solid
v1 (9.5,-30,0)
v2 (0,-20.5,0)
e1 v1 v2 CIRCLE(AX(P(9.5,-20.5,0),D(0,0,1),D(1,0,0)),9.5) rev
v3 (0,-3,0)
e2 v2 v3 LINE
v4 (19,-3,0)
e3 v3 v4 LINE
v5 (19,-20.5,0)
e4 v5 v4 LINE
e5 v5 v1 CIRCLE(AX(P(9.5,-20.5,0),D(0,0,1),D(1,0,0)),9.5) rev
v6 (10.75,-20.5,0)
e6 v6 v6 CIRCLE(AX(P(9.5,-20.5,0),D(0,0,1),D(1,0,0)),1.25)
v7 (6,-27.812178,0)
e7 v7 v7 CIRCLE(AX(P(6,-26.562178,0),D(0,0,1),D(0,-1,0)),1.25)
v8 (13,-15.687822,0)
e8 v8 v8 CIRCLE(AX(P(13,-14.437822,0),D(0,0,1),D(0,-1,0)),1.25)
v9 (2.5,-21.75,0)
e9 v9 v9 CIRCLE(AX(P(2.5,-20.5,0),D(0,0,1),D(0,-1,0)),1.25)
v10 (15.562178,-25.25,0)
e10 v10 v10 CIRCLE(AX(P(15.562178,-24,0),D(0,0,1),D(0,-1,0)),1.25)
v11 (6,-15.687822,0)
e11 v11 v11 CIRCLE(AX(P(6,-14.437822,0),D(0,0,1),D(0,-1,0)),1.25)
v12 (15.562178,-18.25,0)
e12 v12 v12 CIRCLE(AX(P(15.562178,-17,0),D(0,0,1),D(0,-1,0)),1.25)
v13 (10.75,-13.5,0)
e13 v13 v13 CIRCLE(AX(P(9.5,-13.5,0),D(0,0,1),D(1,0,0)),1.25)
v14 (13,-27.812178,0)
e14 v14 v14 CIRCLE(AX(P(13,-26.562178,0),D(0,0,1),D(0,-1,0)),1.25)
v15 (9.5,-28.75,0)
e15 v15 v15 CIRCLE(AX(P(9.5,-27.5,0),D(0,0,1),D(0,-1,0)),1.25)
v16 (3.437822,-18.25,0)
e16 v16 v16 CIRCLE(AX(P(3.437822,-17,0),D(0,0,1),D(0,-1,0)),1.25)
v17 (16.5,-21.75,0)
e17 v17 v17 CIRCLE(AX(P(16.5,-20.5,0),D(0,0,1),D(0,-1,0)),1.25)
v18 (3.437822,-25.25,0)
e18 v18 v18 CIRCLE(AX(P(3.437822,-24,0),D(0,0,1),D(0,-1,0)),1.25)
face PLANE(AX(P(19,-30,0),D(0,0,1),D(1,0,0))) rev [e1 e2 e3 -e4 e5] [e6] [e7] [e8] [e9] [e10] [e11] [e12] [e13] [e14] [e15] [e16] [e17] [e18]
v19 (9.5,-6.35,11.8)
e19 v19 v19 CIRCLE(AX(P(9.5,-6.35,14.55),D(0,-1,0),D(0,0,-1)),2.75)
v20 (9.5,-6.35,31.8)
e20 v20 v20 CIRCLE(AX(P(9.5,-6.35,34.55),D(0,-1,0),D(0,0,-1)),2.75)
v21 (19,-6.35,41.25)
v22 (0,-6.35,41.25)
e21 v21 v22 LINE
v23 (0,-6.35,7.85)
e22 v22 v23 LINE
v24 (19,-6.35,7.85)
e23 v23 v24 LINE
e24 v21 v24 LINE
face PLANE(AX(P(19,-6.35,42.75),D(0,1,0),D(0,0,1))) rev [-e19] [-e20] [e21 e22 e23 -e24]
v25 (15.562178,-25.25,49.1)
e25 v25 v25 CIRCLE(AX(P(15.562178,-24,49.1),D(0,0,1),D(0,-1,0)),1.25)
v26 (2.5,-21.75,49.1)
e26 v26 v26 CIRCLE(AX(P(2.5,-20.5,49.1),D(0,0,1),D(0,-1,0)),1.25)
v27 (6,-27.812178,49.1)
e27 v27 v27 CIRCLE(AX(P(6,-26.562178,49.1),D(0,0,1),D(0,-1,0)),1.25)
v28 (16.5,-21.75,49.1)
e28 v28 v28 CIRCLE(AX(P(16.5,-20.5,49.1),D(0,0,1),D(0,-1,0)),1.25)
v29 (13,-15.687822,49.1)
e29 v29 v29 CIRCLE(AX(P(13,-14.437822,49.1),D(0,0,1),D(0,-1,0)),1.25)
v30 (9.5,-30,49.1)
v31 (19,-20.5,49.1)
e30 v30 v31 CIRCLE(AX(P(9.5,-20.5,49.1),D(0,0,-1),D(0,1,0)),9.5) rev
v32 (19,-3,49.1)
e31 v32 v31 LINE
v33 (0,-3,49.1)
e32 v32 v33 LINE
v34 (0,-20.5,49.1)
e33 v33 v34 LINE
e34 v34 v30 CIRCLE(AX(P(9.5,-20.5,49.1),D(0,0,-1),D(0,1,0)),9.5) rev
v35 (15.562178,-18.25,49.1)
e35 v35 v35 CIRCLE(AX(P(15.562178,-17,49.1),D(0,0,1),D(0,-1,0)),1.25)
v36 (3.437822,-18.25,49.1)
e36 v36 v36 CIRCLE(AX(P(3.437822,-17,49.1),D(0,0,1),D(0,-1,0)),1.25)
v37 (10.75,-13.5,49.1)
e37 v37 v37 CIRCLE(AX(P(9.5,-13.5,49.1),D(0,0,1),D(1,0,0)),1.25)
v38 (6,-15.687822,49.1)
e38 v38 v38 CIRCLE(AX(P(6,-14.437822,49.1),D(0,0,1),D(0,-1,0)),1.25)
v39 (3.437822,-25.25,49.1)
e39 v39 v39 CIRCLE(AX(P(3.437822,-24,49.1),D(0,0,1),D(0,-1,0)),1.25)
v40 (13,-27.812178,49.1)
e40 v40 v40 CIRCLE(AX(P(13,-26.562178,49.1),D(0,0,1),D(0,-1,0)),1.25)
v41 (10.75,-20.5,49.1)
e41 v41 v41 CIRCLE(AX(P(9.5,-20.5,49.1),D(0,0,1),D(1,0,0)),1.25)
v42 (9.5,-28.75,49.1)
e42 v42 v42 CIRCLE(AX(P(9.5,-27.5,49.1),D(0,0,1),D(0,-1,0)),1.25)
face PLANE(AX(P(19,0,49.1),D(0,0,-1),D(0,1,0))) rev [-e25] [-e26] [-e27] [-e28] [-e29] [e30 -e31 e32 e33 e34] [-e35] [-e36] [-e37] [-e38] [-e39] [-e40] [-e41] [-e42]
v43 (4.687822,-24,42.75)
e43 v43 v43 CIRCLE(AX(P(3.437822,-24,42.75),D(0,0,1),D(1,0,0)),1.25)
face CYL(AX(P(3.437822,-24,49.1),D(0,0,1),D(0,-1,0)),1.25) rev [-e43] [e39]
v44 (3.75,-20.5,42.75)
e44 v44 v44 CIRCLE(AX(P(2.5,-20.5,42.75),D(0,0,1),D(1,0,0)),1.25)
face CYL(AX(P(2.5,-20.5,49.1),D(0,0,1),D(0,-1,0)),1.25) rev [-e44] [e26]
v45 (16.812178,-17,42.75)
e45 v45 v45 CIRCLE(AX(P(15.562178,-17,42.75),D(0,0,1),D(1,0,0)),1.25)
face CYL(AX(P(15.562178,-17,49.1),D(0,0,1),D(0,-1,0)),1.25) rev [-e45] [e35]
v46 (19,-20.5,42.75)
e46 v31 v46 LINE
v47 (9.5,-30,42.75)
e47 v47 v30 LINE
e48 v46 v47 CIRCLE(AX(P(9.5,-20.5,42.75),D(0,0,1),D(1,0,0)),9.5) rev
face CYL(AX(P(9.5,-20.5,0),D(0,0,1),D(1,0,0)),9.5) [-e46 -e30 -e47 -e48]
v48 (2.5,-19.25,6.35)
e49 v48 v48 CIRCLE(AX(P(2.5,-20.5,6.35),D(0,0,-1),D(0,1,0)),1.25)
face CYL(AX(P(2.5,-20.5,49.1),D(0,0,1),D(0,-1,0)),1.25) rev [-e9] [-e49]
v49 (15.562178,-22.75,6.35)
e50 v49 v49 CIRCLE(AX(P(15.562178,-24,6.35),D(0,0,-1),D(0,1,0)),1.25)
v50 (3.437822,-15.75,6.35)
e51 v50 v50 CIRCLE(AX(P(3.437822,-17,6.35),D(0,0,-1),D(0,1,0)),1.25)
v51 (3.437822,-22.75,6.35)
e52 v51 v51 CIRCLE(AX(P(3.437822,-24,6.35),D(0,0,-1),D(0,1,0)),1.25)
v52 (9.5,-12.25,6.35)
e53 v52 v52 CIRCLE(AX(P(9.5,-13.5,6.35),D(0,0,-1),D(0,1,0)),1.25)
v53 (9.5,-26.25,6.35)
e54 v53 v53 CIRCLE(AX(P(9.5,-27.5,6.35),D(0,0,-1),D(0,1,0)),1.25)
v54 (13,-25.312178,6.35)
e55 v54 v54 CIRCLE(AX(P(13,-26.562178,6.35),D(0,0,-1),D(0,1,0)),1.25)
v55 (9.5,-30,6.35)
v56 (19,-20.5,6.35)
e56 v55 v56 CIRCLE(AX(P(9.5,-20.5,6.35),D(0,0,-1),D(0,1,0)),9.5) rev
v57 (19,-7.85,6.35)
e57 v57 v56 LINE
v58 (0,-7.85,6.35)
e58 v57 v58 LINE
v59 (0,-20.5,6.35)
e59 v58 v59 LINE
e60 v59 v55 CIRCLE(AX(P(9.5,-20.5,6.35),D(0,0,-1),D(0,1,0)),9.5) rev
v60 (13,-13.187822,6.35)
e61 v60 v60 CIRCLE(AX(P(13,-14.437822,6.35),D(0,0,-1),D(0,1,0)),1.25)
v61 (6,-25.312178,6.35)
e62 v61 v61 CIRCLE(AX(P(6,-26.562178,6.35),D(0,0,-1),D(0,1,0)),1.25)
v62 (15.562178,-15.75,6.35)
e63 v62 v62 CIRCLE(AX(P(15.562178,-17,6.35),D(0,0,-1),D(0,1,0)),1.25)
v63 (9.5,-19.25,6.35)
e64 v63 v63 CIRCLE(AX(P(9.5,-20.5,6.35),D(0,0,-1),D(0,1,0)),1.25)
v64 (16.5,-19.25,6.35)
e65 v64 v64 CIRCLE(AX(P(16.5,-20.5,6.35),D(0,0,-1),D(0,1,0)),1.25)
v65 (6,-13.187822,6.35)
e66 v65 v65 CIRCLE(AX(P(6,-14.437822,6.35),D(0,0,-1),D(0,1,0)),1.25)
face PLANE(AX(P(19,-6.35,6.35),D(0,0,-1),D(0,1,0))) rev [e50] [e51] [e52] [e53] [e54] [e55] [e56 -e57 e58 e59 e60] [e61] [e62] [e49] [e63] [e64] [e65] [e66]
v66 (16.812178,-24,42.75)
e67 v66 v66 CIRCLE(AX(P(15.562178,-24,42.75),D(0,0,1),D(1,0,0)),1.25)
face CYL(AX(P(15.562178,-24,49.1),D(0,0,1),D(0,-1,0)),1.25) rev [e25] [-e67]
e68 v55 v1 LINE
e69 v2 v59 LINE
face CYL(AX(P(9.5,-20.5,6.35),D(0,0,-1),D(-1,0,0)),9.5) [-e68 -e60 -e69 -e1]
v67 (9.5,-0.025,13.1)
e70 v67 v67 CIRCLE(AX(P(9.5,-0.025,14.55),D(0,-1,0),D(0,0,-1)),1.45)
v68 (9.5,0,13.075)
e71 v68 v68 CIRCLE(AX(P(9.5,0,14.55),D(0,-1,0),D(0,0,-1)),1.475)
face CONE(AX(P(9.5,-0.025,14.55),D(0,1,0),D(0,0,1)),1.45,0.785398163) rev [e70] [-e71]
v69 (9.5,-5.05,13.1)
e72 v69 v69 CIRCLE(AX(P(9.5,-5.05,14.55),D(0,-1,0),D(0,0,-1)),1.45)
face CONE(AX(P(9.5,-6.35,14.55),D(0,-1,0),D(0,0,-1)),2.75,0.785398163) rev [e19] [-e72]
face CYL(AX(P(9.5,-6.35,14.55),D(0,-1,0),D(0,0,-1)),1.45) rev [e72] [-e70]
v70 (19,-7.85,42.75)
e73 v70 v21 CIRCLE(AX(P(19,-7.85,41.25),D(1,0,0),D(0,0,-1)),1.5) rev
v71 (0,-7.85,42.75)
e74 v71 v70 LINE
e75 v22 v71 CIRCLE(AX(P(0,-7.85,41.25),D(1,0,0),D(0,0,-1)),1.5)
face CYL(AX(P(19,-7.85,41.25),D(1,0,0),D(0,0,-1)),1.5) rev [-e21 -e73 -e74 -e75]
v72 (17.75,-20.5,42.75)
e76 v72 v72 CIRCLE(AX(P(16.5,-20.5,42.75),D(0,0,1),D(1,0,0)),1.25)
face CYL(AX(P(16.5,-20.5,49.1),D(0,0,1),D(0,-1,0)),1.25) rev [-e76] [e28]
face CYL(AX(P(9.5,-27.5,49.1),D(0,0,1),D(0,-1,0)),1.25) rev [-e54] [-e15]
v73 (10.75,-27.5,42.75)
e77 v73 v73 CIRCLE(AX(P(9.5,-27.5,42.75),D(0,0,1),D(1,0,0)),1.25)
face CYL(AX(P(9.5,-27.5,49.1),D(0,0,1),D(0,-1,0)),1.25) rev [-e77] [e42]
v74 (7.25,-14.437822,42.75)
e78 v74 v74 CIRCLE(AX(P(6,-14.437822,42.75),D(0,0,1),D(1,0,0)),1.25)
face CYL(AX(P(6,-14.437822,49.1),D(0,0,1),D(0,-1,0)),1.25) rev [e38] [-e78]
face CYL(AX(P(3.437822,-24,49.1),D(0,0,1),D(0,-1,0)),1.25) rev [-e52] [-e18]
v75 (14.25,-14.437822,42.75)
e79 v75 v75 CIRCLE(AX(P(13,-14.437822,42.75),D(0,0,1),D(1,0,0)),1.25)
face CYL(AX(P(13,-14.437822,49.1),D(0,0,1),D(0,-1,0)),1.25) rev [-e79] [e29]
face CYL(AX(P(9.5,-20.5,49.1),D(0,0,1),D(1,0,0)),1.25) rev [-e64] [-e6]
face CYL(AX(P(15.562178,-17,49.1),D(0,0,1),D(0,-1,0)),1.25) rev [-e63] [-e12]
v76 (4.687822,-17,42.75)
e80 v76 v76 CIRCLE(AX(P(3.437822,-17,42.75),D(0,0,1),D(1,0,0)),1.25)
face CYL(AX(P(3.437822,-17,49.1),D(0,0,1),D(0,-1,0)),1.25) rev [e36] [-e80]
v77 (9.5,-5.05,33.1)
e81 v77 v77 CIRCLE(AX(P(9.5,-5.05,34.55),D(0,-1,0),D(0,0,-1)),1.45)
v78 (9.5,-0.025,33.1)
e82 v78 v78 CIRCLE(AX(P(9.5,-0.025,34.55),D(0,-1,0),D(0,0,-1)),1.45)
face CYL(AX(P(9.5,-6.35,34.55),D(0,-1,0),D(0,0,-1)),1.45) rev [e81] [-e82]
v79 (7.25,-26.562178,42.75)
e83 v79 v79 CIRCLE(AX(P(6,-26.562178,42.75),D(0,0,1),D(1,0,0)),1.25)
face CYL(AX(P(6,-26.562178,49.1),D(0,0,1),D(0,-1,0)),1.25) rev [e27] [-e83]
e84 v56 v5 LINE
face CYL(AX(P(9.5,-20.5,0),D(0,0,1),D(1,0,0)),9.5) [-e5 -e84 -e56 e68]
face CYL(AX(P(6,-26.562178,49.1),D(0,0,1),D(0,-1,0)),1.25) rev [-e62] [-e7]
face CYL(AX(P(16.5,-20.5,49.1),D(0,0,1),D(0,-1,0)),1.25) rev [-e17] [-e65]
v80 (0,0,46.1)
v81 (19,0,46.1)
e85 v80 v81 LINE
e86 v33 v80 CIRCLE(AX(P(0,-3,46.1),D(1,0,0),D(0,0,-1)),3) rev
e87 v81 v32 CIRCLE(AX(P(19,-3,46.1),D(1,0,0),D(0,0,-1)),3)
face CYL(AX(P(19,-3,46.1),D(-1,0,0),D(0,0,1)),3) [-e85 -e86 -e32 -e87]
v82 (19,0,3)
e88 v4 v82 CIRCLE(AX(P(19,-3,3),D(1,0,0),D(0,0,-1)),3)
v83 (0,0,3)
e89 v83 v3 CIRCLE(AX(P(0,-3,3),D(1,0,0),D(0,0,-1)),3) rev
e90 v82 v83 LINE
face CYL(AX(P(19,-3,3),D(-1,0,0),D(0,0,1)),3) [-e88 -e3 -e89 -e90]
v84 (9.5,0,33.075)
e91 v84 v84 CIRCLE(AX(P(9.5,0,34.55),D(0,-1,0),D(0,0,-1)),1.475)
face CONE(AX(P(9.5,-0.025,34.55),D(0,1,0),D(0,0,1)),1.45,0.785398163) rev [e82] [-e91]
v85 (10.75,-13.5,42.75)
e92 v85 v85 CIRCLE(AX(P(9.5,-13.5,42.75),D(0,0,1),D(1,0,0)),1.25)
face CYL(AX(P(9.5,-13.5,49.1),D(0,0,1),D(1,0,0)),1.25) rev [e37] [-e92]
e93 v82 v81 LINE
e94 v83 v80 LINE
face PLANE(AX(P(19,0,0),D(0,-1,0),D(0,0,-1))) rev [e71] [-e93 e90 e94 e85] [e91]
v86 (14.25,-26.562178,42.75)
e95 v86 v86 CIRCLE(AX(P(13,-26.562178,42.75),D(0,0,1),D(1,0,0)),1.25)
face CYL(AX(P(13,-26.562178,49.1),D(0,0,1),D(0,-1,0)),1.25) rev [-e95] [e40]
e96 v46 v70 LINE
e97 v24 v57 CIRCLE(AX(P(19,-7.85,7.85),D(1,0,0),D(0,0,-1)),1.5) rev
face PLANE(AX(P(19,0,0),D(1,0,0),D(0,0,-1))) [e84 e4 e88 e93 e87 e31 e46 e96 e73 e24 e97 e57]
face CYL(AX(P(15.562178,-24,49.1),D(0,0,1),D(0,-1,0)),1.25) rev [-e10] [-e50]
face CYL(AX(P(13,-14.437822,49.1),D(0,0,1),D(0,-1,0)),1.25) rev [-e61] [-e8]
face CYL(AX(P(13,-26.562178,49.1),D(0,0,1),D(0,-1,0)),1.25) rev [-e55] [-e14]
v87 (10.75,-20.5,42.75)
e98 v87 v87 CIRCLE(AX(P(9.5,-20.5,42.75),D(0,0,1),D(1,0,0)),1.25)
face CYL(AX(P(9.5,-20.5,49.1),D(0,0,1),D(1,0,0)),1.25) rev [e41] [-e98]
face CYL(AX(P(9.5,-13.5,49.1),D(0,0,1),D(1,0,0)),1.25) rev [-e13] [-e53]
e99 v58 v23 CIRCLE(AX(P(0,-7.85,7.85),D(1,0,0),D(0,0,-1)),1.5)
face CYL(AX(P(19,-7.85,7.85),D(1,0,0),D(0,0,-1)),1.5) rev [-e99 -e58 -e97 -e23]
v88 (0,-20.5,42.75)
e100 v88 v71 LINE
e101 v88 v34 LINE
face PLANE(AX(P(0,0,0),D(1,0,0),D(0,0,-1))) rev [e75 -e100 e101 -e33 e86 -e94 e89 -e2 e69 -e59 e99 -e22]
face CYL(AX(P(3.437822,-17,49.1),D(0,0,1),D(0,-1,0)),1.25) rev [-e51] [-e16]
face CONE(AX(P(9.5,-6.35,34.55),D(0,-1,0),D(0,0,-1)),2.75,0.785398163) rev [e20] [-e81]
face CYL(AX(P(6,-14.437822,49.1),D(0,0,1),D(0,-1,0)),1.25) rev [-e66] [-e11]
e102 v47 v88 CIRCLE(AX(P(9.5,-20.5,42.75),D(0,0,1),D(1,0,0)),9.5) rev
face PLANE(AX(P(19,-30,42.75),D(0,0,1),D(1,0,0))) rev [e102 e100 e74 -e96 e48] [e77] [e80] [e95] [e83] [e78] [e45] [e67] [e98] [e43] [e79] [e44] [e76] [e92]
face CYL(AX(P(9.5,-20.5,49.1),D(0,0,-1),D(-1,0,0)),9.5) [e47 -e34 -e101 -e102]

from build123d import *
from OCP.BRepFilletAPI import BRepFilletAPI_MakeFillet

# Parameters (mm, degrees)
BOSS_EXTRUDE1_DEPTH                            = 19
FILLET1_R                                      = 9.5
F_2_5MM_DOWEL_HOLE1_D                          = 2.5
CIRPATTERN1_COUNT                              = 12
FILLET2_R1                                     = 3
FILLET2_R2                                     = 1.5
F_2_5MM_DOWEL_HOLE2_D                          = 2.5
CSK_FOR_M2_5_FLAT_HEAD_MACHINE_SCREW1_AT_COUNT = 2
CSK_FOR_M2_5_FLAT_HEAD_MACHINE_SCREW1_AT_PITCH = 20


with BuildPart() as part:
    # Sketch16 → Boss-Extrude1 (new body)
    with BuildSketch(Plane(origin=(0, 0, 0), x_dir=(0, 0, -1), z_dir=(1, 0, 0))):
        Polygon((0, 0), (-49.1, 0), (-49.1, -30), (-42.75, -30), (-42.75, -6.35), (-6.35, -6.35), (-6.35, -30), (0, -30), align=None)
    extrude(amount=BOSS_EXTRUDE1_DEPTH)

    # Fillet1
    fillet1_edges = [part.edges().sort_by_distance(p)[0] for p in [
        (19, -30, 3.175),
        (0, -30, 3.175),
        (0, -30, 45.925),
        (19, -30, 45.925),
    ]]
    fillet(fillet1_edges, radius=FILLET1_R - 0.0001)  # a hair under: the kernel refuses the full size

    # Ø2.5mm Dowel Hole1 (through all)
    with Locations(Plane.XY.offset(49.1)):
        with Locations((9.5, -13.5)):
            f_2_5mm_dowel_hole1 = Hole(F_2_5MM_DOWEL_HOLE1_D / 2)

    # CirPattern1: Ø2.5mm Dowel Hole1 ×12 about axis
    cirpattern1_axis = Axis((9.5, -20.5, 0), (0, 0, 1))
    for i in range(1, CIRPATTERN1_COUNT):
        add(f_2_5mm_dowel_hole1.rotate(cirpattern1_axis, i * 360 / CIRPATTERN1_COUNT), mode=Mode.SUBTRACT)

    # Fillet2: one fillet with a radius per group of edges: ONE call of the kernel's fillet builder (fillet() takes one radius for all edges)
    fillet2_edges_1 = [part.edges().sort_by_distance(p)[0] for p in [
        (9.5, 0, 49.1),
        (9.5, 0, 0),
    ]]
    fillet2_edges_2 = [part.edges().sort_by_distance(p)[0] for p in [
        (9.5, -6.35, 42.75),
        (9.5, -6.35, 6.35),
    ]]
    fillet2 = BRepFilletAPI_MakeFillet(part.part.solid().wrapped)
    for e in fillet2_edges_1:
        fillet2.Add(FILLET2_R1, e.wrapped)
    for e in fillet2_edges_2:
        fillet2.Add(FILLET2_R2, e.wrapped)
    add(Compound.cast(fillet2.Shape()), mode=Mode.REPLACE)

    # Ø2.5mm Dowel Hole2 (through all)
    with Locations(Plane.XY.offset(49.1)):
        with Locations((9.5, -20.5)):
            Hole(F_2_5MM_DOWEL_HOLE2_D / 2)

    # Sketch28 → CSK for M2.5 Flat Head Machine Screw1 (revolve, cut)
    with BuildSketch(Plane(origin=(9.5, -6.35, 34.55), x_dir=(0, 0, -1), z_dir=(1, 0, 0))):
        Polygon((0, 0), (0, 6.35), (1.475, 6.35), (1.45, 6.325), (1.45, 1.3), (2.75, 0), align=None)
    csk_for_m2_5_flat_head_machine_screw1 = revolve(axis=Axis((9.5, -12.7, 34.55), (0, 1, 0)), mode=Mode.SUBTRACT)

    # CSK for M2.5 Flat Head Machine Screw1 at: CSK for M2.5 Flat Head Machine Screw1 ×2
    with Locations(*[(0, 0, -i * CSK_FOR_M2_5_FLAT_HEAD_MACHINE_SCREW1_AT_PITCH) for i in range(1, CSK_FOR_M2_5_FLAT_HEAD_MACHINE_SCREW1_AT_COUNT)]):
        add(csk_for_m2_5_flat_head_machine_screw1, mode=Mode.SUBTRACT)


solid = part.part
